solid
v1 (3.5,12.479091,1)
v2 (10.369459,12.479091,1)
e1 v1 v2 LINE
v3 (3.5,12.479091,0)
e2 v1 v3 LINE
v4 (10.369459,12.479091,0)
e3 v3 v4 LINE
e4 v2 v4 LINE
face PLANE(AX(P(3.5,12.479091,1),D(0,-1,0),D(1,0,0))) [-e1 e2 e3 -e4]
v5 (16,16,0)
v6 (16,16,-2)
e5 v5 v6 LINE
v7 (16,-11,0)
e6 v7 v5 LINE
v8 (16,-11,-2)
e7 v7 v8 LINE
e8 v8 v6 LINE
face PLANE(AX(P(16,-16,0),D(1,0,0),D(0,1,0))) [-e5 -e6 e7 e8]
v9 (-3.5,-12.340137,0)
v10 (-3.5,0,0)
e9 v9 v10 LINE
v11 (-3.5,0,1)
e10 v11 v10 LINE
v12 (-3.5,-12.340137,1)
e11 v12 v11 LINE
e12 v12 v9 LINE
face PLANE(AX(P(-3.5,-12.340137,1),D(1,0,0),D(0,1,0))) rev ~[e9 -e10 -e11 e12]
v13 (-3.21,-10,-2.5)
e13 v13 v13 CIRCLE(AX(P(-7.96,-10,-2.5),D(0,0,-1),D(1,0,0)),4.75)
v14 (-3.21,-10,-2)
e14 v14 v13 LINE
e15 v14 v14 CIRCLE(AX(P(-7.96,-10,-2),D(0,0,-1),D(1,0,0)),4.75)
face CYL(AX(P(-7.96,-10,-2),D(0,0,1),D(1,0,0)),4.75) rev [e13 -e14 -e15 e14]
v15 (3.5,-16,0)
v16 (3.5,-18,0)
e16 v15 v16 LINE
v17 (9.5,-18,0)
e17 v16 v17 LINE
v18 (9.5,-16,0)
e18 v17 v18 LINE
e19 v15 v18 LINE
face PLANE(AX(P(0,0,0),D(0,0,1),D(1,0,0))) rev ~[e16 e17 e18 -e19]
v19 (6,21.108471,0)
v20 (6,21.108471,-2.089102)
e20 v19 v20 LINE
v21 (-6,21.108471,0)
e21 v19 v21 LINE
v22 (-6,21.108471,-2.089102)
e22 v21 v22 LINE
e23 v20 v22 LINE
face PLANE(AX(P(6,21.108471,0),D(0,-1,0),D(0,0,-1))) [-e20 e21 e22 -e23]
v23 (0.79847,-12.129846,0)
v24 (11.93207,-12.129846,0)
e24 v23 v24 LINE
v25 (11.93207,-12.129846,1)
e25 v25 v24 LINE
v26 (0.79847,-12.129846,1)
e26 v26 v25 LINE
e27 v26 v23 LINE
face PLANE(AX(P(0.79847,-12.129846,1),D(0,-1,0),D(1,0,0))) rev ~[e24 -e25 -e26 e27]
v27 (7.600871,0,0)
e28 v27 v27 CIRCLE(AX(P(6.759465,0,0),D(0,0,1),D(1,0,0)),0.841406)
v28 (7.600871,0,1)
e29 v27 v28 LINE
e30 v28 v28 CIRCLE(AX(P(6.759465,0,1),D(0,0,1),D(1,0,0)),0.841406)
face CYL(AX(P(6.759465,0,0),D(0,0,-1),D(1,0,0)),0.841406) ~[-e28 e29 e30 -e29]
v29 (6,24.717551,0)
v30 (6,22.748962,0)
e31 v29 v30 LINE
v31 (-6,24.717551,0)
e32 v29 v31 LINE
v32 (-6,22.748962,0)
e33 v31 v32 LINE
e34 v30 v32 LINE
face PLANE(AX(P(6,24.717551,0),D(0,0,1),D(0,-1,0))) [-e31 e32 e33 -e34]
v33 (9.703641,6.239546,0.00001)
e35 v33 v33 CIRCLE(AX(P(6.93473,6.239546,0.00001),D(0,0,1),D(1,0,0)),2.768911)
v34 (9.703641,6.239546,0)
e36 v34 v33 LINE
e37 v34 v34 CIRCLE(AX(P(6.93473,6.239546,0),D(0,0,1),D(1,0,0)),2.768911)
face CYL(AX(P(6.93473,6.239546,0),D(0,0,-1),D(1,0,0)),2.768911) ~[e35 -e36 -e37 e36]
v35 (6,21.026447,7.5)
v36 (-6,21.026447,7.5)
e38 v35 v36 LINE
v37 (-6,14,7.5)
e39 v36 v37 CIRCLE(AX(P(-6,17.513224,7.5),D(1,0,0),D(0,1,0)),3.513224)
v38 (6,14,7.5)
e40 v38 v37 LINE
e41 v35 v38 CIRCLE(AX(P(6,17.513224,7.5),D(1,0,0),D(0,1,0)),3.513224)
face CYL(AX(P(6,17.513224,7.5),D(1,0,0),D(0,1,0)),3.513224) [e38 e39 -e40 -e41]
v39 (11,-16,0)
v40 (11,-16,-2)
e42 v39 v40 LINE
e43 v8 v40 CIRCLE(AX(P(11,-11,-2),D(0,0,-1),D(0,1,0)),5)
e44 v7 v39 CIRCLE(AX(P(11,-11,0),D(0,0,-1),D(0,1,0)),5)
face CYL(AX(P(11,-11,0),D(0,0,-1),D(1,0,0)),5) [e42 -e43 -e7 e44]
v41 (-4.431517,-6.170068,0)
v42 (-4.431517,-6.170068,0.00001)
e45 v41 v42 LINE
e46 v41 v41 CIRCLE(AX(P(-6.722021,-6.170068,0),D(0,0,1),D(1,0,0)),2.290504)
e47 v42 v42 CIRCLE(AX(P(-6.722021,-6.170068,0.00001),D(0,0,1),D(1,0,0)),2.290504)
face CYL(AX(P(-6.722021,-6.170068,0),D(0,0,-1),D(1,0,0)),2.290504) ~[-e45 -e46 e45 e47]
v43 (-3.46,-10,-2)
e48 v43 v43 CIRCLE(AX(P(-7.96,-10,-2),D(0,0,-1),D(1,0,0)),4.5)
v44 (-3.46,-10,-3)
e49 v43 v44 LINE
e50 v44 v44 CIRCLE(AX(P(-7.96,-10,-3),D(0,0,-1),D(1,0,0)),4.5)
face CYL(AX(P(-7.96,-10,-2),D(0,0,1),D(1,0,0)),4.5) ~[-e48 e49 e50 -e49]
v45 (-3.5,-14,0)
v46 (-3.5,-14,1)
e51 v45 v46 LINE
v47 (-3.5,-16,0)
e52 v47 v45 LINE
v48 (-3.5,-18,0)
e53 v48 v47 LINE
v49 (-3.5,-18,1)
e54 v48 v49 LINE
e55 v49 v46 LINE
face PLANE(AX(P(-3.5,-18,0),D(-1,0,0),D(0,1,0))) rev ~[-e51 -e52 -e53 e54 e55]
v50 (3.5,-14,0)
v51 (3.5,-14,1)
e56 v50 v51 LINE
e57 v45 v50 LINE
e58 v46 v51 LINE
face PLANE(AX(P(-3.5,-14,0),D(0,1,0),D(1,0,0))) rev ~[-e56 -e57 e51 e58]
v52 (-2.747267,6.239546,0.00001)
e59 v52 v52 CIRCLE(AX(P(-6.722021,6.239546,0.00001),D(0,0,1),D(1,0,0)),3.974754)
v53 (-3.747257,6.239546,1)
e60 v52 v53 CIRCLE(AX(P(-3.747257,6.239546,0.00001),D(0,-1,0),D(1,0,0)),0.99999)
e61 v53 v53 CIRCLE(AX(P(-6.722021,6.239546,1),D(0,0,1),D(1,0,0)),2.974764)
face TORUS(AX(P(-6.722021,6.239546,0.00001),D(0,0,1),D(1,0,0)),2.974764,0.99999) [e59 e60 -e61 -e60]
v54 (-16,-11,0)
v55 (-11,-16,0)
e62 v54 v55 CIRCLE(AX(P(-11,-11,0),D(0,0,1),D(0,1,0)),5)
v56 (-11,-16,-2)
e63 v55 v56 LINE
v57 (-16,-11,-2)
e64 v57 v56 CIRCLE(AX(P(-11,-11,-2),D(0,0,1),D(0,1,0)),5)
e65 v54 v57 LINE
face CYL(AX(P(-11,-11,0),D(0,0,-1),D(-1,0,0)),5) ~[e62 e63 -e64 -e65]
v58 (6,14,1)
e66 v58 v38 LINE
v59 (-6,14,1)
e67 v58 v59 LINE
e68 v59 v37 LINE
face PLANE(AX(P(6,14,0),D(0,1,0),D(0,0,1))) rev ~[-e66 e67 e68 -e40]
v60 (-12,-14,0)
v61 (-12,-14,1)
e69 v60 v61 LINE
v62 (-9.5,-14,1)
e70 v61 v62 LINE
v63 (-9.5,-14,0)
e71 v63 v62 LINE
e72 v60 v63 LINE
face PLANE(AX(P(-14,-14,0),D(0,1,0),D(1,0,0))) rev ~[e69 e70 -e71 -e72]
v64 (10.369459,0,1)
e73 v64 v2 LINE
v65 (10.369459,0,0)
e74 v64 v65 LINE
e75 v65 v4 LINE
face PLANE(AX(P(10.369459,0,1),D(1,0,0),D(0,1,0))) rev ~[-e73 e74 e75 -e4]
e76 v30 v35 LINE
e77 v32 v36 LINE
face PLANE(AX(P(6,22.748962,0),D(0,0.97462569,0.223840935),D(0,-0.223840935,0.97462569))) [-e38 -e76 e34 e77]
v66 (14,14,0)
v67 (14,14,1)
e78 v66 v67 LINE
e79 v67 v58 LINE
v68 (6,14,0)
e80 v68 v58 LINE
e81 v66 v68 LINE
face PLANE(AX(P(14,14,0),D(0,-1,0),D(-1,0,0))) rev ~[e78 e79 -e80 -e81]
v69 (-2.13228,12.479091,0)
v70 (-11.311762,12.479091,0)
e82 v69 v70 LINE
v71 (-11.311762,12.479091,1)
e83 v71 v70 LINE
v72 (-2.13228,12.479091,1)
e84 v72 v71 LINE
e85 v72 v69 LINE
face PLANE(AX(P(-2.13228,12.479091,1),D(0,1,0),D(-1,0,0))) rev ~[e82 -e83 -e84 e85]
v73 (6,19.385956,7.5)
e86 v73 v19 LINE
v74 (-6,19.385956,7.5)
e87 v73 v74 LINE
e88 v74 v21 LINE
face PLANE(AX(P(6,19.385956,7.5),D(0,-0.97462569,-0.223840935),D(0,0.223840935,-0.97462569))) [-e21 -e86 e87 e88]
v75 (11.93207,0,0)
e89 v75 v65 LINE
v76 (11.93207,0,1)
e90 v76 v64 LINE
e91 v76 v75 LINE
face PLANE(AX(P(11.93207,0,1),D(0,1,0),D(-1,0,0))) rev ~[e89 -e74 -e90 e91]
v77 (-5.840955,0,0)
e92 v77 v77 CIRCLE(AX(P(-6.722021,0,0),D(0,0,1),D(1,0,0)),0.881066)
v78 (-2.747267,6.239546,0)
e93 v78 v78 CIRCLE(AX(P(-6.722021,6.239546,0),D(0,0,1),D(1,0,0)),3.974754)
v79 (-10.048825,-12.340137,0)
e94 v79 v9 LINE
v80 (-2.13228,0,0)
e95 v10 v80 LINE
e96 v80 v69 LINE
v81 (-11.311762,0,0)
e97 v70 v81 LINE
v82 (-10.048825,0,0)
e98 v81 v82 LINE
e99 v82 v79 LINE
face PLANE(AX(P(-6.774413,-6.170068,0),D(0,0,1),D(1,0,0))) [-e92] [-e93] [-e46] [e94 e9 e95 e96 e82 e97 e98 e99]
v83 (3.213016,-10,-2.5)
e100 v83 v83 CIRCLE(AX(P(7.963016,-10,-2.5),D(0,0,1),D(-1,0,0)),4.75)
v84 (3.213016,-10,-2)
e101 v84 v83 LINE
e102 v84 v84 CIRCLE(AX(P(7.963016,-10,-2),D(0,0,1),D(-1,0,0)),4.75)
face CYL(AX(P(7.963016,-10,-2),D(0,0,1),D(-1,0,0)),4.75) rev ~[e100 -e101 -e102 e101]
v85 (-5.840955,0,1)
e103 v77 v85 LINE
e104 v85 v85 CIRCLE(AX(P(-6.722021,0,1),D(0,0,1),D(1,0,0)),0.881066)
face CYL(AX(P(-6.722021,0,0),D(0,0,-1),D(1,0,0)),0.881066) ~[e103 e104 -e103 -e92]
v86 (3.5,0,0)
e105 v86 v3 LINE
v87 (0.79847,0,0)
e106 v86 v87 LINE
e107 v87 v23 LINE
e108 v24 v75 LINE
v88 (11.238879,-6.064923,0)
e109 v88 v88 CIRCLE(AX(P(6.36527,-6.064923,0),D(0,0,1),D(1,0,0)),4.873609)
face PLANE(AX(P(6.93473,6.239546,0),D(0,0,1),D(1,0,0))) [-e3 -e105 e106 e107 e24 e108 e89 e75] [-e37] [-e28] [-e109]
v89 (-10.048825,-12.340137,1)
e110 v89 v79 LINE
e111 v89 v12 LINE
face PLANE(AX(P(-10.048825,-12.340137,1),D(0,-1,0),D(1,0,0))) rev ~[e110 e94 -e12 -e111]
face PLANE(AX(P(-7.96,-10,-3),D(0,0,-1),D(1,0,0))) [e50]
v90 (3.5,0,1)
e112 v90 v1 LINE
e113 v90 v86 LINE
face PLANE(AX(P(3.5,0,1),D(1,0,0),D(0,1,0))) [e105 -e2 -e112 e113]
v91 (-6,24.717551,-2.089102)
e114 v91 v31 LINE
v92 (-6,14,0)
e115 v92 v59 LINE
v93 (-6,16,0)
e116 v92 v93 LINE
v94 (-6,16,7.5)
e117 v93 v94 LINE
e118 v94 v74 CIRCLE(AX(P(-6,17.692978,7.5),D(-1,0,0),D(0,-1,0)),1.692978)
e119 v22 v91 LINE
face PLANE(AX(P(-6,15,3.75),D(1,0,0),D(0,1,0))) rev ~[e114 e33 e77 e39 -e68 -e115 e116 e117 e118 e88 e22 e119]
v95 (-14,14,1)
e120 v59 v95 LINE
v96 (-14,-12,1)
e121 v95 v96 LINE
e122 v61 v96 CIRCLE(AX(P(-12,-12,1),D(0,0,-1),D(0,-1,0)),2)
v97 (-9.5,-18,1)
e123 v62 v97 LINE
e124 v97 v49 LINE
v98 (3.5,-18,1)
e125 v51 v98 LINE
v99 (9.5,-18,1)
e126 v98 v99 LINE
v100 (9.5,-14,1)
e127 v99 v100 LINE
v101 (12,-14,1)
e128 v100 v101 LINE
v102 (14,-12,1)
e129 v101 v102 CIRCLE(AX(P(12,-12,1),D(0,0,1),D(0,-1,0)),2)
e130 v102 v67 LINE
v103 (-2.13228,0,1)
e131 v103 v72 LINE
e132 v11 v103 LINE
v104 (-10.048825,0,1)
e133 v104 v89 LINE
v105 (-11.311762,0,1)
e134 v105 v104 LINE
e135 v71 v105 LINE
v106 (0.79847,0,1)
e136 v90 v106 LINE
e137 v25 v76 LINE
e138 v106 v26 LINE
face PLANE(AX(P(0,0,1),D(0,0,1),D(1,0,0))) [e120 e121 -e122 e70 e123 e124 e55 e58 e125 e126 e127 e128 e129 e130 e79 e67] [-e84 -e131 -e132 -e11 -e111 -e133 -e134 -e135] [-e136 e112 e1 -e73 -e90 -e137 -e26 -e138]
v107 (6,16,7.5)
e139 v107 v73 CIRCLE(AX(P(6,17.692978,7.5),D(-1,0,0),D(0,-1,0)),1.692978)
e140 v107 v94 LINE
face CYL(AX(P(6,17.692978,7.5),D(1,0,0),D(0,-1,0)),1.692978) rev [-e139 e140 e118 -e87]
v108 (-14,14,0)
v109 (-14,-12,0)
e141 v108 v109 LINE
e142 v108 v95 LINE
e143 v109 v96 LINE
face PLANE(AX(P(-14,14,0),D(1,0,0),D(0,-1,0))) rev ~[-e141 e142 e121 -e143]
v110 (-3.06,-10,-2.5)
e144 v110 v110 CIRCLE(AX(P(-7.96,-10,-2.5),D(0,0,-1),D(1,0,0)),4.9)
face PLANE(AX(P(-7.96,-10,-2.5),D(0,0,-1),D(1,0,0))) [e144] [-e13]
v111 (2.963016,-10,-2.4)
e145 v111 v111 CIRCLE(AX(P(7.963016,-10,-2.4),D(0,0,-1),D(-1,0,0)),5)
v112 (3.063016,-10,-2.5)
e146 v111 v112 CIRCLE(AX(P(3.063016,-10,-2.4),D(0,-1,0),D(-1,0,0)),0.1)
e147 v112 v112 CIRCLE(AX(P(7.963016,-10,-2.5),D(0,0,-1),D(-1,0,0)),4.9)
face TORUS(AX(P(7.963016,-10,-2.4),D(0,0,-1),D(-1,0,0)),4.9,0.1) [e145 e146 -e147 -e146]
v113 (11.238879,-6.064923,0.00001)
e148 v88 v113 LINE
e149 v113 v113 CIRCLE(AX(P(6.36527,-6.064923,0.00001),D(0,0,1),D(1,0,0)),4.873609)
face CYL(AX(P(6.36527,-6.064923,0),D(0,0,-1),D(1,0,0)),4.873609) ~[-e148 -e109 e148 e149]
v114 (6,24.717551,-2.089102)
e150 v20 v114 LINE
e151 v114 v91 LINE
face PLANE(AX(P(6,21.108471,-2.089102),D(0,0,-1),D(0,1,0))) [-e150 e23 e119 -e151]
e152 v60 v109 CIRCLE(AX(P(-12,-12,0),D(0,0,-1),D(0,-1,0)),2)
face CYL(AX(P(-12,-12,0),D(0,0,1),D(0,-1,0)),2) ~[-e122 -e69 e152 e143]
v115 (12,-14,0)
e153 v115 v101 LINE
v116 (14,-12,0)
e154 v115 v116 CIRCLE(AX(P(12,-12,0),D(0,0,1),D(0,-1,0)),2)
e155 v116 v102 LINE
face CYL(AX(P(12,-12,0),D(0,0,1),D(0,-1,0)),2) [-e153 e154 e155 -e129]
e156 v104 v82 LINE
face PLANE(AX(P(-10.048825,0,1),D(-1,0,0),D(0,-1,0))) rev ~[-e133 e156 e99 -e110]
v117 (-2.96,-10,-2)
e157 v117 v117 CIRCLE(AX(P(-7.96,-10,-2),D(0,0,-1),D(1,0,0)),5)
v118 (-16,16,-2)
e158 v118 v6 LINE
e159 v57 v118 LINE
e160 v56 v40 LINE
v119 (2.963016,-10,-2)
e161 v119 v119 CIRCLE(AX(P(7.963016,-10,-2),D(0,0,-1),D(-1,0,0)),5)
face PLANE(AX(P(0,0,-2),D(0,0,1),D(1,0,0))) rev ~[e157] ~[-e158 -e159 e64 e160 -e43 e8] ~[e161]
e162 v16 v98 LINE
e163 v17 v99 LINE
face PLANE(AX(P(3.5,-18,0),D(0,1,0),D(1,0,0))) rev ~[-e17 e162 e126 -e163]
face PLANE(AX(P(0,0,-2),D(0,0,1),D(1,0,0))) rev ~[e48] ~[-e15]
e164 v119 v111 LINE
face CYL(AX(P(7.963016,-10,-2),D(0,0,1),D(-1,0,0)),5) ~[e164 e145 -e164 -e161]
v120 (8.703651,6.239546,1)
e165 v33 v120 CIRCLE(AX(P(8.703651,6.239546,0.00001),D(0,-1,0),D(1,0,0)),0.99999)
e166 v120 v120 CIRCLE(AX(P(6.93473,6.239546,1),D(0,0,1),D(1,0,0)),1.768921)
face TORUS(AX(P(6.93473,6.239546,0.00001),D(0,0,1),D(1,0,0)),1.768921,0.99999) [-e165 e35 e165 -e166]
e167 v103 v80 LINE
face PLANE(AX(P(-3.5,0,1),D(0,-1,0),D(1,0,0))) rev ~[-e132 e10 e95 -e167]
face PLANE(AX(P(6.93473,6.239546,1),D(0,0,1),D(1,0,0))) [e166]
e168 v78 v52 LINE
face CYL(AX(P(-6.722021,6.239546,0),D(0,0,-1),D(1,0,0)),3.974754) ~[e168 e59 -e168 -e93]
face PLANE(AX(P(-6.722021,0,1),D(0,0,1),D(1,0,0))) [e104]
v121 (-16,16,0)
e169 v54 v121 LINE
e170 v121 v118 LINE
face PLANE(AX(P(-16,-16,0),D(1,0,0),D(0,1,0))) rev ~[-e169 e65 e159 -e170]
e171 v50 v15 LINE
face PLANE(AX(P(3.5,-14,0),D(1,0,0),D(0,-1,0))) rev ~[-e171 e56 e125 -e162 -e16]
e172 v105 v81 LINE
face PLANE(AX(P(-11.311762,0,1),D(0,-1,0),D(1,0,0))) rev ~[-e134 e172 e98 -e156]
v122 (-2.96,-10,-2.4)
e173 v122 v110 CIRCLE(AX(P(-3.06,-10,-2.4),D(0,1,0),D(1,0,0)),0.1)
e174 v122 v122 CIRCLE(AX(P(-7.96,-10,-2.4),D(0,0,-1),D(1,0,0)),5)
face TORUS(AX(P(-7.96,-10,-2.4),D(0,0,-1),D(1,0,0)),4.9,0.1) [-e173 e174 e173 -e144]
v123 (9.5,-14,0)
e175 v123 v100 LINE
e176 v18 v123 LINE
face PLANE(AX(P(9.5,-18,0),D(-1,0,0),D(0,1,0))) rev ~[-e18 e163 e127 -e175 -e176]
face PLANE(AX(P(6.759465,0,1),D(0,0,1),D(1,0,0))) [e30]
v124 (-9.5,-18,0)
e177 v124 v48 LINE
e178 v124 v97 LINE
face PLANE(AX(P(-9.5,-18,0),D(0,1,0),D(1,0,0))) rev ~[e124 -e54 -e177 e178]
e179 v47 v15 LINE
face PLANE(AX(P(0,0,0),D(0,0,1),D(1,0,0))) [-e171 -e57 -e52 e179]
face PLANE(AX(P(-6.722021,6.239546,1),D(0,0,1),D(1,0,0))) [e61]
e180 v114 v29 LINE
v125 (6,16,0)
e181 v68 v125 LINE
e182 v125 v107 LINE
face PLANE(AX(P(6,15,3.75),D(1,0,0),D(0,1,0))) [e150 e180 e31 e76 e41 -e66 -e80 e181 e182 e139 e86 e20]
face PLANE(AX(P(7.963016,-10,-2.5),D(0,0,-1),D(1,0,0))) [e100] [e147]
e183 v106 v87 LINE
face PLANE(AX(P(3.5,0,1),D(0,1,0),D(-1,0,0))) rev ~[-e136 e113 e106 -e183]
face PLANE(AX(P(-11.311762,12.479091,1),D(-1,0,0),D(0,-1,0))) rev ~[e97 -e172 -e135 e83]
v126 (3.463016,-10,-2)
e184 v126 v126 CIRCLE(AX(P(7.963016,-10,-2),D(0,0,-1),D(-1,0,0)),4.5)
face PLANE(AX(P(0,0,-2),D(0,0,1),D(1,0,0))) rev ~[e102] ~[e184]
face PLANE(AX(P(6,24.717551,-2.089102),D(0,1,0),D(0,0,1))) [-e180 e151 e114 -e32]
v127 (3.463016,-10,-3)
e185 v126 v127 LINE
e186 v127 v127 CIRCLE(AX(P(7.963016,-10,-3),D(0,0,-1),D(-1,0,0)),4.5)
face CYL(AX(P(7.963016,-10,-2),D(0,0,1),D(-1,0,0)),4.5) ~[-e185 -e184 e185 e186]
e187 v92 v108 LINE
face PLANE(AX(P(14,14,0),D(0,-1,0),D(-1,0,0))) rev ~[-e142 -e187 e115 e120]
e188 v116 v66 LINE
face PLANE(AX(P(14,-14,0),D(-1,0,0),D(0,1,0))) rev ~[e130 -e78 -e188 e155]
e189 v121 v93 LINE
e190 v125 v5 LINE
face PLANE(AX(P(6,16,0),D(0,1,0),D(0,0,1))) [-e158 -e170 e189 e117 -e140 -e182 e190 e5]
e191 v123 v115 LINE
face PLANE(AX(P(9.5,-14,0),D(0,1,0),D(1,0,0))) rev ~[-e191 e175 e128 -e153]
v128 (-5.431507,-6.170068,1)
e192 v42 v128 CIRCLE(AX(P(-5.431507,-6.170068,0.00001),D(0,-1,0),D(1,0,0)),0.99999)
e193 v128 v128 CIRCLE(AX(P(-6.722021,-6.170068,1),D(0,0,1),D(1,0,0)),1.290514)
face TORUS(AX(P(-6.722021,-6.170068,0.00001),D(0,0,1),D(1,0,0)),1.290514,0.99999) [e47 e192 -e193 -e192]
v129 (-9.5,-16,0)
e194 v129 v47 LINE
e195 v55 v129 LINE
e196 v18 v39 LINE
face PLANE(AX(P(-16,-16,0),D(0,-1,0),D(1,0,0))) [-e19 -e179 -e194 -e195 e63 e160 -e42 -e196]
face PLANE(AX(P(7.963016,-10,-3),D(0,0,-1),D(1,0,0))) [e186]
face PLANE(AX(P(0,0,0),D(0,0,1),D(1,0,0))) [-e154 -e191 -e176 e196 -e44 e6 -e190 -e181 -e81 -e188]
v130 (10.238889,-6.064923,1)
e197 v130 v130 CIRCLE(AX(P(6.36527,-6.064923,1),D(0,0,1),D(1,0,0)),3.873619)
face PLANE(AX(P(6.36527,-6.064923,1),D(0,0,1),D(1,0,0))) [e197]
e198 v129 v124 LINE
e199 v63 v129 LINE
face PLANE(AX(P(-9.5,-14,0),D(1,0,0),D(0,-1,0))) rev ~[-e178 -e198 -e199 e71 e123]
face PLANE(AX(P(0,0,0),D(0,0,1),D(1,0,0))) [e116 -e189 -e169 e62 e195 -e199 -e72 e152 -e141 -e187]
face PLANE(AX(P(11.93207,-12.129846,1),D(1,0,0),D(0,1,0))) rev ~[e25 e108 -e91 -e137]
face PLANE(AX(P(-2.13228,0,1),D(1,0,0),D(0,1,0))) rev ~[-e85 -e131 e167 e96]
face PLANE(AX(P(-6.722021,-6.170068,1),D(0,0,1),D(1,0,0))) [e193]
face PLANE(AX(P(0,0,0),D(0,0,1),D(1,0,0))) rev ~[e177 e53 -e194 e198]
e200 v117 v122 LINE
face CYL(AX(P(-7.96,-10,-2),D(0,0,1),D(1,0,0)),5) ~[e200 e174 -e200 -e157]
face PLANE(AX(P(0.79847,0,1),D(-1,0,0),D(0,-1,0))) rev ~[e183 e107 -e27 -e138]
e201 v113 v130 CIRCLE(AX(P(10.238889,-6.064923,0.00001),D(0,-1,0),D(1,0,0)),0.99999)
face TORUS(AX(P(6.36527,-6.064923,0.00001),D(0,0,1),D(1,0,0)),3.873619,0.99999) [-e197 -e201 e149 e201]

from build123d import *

# Parameters (mm, degrees)
F0_W      = 32
F0_H      = 32
F1_DEPTH  = 2
F2_W      = 6
F2_H      = 2
F3_DEPTH  = 1
F4_R      = 5
F5_R      = 2
F6_R      = 5
F6_R_2    = 4.75
F7_DEPTH  = 0.5
F6_R_3    = 4.5
F8_DEPTH  = 1
F9_R      = 0.1
F10_R     = 0.1
F11_W     = 6.8694591671
F11_H     = 12.4790910631
F12_DEPTH = 1
F13_R     = 3.9747540769
F13_R_2   = 0.8810664351
F13_R_3   = 2.2905042987
F14_DEPTH = 1
F15_R     = 0.99999
F16_R     = 2.7689113732
F16_R_2   = 0.8414057699
F16_R_3   = 4.8736093879
F17_DEPTH = 1
F18_R     = 0.99999
F20_W     = 2
F20_H     = 7.5
F21_DEPTH = 12


# Not quite as in the source:
# - a fillet or chamfer is up to 0.001 mm smaller than in the source, because OpenCascade refuses the exact size


with BuildPart() as f1:
    # F0 (on Top) → F1 (new body)
    with BuildSketch(Plane.XY):
        Rectangle(F0_W, F0_H)
    extrude(amount=-F1_DEPTH)

    # F2 (on face) → F3 (join)
    with BuildSketch(Plane.XY):
        Polygon((14, 14), (-14, 14), (-14, -14), (-9.5, -14), (-3.5, -14), (3.5, -14), (9.5, -14), (14, -14), align=None)
        with Locations((6.5, -17)):
            Rectangle(F2_W, F2_H)
        with Locations((6.5, -15)):
            Rectangle(F2_W, F2_H)
        with Locations((-6.5, -17)):
            Rectangle(F2_W, F2_H)
        with Locations((-6.5, -15)):
            Rectangle(F2_W, F2_H)
    extrude(amount=F3_DEPTH)

    # F4
    f4_edges = [f1.edges().sort_by_distance(p)[0] for p in [
        (-16, -16, -1),
        (16, -16, -1),
    ]]
    fillet(f4_edges, radius=F4_R)

    # F5
    f5_edges = [f1.edges().sort_by_distance(p)[0] for p in [
        (-14, -14, 0.5),
        (14, -14, 0.5),
    ]]
    fillet(f5_edges, radius=F5_R)

    # F6 (on face) → F7 (join)
    with BuildSketch(Plane(origin=(0, 0, -2), x_dir=(1, 0, 0), z_dir=(0, 0, -1))):
        with Locations((-7.96, 10)):
            Circle(F6_R)
        with Locations((-7.96, 10)):
            Circle(F6_R_2, mode=Mode.SUBTRACT)
        with BuildLine():
            ThreePointArc((12.9630157733, 10), (7.9630157733, 15), (2.9630157733, 10))
            ThreePointArc((2.9630157733, 10), (7.9630157733, 5), (12.9630157733, 10))
        make_face()
        with BuildLine():
            ThreePointArc((12.7130157733, 10), (7.9630157733, 5.25), (3.2130157733, 10))
            ThreePointArc((3.2130157733, 10), (7.9630157733, 14.75), (12.7130157733, 10))
        make_face(mode=Mode.SUBTRACT)
    extrude(amount=F7_DEPTH)

    # F6 (on face) → F8 (join)
    with BuildSketch(Plane(origin=(0, 0, -2), x_dir=(1, 0, 0), z_dir=(0, 0, -1))):
        with Locations((-7.96, 10)):
            Circle(F6_R_3)
        with BuildLine():
            ThreePointArc((12.4630157733, 10), (7.9630157733, 14.5), (3.4630157733, 10))
            ThreePointArc((3.4630157733, 10), (7.9630157733, 5.5), (12.4630157733, 10))
        make_face()
    extrude(amount=F8_DEPTH)

    # F9
    f9_edges = [f1.edges().sort_by_distance(p)[0] for p in [
        (-12.96, -10, -2.5),
    ]]
    fillet(f9_edges, radius=F9_R)

    # F10
    f10_edges = [f1.edges().sort_by_distance(p)[0] for p in [
        (12.963016, -10, -2.5),
    ]]
    fillet(f10_edges, radius=F10_R)

    # F11 (on face) → F12 (cut)
    with BuildSketch(Plane.XY.offset(1)):
        Polygon((-10.0488252938, -12.3401368037), (-3.5, -12.3401368037), (-3.5, 0), (-7.3588341475, 0), (-10.0488252938, 0), align=None)
        Polygon((-7.3588341475, 0), (-3.5, 0), (-2.1322800312, 0), (-2.1322800312, 12.4790910631), (-11.3117620349, 12.4790910631), (-11.3117620349, 0), (-10.0488252938, 0), align=None)
        with Locations((6.9347295836, 6.2395455316)):
            Rectangle(F11_W, F11_H)
        Polygon((0.7984698168, 0), (0.7984698168, -12.129846029), (11.932070367, -12.129846029), (11.932070367, 0), (10.3694591671, 0), (3.5, 0), align=None)
    extrude(amount=-F12_DEPTH, mode=Mode.SUBTRACT)

    # F13 (on face) → F14 (join)
    with BuildSketch(Plane.XY):
        with Locations((-6.7220210331, 6.2395455316)):
            Circle(F13_R)
        with Locations((-6.7220210331, 0)):
            Circle(F13_R_2)
        with Locations((-6.7220210331, -6.1700684018)):
            Circle(F13_R_3)
    extrude(amount=F14_DEPTH)

    # F15 (radius 1 in the source; OpenCascade refuses exactly that, so slightly less here)
    f15_edges = [f1.edges().sort_by_distance(p)[0] for p in [
        (-10.696775, 6.239546, 1),
        (-9.012525, -6.170068, 1),
    ]]
    fillet(f15_edges, radius=F15_R)

    # F16 (on face) → F17 (join)
    with BuildSketch(Plane.XY):
        with Locations((6.9347295836, 6.2395455316)):
            Circle(F16_R)
        with Locations((6.7594647408, 0)):
            Circle(F16_R_2)
        with Locations((6.3652700919, -6.0649230145)):
            Circle(F16_R_3)
    extrude(amount=F17_DEPTH)

    # F18 (radius 1 in the source; OpenCascade refuses exactly that, so slightly less here)
    f18_edges = [f1.edges().sort_by_distance(p)[0] for p in [
        (4.165818, 6.239546, 1),
        (1.491661, -6.064923, 1),
    ]]
    fillet(f18_edges, radius=F18_R)

    # F20 (on offset) → F21 (join)
    with BuildSketch(Plane.YZ.offset(6)):
        with Locations((15, 3.75)):
            Rectangle(F20_W, F20_H)
        with BuildLine():
            ThreePointArc((21.0264474154, 7.5), (17.5132237077, 11.0132237077), (14, 7.5))
            Line((14, 7.5), (16, 7.5))
            ThreePointArc((16, 7.5), (17.6929781139, 9.1929781139), (19.3859562278, 7.5))
            Line((19.3859562278, 7.5), (21.1084708571, 0))
            Line((21.1084708571, 0), (22.7489620447, 0))
            Line((22.7489620447, 0), (21.0264474154, 7.5))
        make_face()
        Polygon((24.7175507247, 0), (22.7489620447, 0), (21.1084708571, 0), (21.1084708571, -2.0891015884), (24.7175507247, -2.0891015884), align=None)
    extrude(amount=-F21_DEPTH)


solid = f1.part
